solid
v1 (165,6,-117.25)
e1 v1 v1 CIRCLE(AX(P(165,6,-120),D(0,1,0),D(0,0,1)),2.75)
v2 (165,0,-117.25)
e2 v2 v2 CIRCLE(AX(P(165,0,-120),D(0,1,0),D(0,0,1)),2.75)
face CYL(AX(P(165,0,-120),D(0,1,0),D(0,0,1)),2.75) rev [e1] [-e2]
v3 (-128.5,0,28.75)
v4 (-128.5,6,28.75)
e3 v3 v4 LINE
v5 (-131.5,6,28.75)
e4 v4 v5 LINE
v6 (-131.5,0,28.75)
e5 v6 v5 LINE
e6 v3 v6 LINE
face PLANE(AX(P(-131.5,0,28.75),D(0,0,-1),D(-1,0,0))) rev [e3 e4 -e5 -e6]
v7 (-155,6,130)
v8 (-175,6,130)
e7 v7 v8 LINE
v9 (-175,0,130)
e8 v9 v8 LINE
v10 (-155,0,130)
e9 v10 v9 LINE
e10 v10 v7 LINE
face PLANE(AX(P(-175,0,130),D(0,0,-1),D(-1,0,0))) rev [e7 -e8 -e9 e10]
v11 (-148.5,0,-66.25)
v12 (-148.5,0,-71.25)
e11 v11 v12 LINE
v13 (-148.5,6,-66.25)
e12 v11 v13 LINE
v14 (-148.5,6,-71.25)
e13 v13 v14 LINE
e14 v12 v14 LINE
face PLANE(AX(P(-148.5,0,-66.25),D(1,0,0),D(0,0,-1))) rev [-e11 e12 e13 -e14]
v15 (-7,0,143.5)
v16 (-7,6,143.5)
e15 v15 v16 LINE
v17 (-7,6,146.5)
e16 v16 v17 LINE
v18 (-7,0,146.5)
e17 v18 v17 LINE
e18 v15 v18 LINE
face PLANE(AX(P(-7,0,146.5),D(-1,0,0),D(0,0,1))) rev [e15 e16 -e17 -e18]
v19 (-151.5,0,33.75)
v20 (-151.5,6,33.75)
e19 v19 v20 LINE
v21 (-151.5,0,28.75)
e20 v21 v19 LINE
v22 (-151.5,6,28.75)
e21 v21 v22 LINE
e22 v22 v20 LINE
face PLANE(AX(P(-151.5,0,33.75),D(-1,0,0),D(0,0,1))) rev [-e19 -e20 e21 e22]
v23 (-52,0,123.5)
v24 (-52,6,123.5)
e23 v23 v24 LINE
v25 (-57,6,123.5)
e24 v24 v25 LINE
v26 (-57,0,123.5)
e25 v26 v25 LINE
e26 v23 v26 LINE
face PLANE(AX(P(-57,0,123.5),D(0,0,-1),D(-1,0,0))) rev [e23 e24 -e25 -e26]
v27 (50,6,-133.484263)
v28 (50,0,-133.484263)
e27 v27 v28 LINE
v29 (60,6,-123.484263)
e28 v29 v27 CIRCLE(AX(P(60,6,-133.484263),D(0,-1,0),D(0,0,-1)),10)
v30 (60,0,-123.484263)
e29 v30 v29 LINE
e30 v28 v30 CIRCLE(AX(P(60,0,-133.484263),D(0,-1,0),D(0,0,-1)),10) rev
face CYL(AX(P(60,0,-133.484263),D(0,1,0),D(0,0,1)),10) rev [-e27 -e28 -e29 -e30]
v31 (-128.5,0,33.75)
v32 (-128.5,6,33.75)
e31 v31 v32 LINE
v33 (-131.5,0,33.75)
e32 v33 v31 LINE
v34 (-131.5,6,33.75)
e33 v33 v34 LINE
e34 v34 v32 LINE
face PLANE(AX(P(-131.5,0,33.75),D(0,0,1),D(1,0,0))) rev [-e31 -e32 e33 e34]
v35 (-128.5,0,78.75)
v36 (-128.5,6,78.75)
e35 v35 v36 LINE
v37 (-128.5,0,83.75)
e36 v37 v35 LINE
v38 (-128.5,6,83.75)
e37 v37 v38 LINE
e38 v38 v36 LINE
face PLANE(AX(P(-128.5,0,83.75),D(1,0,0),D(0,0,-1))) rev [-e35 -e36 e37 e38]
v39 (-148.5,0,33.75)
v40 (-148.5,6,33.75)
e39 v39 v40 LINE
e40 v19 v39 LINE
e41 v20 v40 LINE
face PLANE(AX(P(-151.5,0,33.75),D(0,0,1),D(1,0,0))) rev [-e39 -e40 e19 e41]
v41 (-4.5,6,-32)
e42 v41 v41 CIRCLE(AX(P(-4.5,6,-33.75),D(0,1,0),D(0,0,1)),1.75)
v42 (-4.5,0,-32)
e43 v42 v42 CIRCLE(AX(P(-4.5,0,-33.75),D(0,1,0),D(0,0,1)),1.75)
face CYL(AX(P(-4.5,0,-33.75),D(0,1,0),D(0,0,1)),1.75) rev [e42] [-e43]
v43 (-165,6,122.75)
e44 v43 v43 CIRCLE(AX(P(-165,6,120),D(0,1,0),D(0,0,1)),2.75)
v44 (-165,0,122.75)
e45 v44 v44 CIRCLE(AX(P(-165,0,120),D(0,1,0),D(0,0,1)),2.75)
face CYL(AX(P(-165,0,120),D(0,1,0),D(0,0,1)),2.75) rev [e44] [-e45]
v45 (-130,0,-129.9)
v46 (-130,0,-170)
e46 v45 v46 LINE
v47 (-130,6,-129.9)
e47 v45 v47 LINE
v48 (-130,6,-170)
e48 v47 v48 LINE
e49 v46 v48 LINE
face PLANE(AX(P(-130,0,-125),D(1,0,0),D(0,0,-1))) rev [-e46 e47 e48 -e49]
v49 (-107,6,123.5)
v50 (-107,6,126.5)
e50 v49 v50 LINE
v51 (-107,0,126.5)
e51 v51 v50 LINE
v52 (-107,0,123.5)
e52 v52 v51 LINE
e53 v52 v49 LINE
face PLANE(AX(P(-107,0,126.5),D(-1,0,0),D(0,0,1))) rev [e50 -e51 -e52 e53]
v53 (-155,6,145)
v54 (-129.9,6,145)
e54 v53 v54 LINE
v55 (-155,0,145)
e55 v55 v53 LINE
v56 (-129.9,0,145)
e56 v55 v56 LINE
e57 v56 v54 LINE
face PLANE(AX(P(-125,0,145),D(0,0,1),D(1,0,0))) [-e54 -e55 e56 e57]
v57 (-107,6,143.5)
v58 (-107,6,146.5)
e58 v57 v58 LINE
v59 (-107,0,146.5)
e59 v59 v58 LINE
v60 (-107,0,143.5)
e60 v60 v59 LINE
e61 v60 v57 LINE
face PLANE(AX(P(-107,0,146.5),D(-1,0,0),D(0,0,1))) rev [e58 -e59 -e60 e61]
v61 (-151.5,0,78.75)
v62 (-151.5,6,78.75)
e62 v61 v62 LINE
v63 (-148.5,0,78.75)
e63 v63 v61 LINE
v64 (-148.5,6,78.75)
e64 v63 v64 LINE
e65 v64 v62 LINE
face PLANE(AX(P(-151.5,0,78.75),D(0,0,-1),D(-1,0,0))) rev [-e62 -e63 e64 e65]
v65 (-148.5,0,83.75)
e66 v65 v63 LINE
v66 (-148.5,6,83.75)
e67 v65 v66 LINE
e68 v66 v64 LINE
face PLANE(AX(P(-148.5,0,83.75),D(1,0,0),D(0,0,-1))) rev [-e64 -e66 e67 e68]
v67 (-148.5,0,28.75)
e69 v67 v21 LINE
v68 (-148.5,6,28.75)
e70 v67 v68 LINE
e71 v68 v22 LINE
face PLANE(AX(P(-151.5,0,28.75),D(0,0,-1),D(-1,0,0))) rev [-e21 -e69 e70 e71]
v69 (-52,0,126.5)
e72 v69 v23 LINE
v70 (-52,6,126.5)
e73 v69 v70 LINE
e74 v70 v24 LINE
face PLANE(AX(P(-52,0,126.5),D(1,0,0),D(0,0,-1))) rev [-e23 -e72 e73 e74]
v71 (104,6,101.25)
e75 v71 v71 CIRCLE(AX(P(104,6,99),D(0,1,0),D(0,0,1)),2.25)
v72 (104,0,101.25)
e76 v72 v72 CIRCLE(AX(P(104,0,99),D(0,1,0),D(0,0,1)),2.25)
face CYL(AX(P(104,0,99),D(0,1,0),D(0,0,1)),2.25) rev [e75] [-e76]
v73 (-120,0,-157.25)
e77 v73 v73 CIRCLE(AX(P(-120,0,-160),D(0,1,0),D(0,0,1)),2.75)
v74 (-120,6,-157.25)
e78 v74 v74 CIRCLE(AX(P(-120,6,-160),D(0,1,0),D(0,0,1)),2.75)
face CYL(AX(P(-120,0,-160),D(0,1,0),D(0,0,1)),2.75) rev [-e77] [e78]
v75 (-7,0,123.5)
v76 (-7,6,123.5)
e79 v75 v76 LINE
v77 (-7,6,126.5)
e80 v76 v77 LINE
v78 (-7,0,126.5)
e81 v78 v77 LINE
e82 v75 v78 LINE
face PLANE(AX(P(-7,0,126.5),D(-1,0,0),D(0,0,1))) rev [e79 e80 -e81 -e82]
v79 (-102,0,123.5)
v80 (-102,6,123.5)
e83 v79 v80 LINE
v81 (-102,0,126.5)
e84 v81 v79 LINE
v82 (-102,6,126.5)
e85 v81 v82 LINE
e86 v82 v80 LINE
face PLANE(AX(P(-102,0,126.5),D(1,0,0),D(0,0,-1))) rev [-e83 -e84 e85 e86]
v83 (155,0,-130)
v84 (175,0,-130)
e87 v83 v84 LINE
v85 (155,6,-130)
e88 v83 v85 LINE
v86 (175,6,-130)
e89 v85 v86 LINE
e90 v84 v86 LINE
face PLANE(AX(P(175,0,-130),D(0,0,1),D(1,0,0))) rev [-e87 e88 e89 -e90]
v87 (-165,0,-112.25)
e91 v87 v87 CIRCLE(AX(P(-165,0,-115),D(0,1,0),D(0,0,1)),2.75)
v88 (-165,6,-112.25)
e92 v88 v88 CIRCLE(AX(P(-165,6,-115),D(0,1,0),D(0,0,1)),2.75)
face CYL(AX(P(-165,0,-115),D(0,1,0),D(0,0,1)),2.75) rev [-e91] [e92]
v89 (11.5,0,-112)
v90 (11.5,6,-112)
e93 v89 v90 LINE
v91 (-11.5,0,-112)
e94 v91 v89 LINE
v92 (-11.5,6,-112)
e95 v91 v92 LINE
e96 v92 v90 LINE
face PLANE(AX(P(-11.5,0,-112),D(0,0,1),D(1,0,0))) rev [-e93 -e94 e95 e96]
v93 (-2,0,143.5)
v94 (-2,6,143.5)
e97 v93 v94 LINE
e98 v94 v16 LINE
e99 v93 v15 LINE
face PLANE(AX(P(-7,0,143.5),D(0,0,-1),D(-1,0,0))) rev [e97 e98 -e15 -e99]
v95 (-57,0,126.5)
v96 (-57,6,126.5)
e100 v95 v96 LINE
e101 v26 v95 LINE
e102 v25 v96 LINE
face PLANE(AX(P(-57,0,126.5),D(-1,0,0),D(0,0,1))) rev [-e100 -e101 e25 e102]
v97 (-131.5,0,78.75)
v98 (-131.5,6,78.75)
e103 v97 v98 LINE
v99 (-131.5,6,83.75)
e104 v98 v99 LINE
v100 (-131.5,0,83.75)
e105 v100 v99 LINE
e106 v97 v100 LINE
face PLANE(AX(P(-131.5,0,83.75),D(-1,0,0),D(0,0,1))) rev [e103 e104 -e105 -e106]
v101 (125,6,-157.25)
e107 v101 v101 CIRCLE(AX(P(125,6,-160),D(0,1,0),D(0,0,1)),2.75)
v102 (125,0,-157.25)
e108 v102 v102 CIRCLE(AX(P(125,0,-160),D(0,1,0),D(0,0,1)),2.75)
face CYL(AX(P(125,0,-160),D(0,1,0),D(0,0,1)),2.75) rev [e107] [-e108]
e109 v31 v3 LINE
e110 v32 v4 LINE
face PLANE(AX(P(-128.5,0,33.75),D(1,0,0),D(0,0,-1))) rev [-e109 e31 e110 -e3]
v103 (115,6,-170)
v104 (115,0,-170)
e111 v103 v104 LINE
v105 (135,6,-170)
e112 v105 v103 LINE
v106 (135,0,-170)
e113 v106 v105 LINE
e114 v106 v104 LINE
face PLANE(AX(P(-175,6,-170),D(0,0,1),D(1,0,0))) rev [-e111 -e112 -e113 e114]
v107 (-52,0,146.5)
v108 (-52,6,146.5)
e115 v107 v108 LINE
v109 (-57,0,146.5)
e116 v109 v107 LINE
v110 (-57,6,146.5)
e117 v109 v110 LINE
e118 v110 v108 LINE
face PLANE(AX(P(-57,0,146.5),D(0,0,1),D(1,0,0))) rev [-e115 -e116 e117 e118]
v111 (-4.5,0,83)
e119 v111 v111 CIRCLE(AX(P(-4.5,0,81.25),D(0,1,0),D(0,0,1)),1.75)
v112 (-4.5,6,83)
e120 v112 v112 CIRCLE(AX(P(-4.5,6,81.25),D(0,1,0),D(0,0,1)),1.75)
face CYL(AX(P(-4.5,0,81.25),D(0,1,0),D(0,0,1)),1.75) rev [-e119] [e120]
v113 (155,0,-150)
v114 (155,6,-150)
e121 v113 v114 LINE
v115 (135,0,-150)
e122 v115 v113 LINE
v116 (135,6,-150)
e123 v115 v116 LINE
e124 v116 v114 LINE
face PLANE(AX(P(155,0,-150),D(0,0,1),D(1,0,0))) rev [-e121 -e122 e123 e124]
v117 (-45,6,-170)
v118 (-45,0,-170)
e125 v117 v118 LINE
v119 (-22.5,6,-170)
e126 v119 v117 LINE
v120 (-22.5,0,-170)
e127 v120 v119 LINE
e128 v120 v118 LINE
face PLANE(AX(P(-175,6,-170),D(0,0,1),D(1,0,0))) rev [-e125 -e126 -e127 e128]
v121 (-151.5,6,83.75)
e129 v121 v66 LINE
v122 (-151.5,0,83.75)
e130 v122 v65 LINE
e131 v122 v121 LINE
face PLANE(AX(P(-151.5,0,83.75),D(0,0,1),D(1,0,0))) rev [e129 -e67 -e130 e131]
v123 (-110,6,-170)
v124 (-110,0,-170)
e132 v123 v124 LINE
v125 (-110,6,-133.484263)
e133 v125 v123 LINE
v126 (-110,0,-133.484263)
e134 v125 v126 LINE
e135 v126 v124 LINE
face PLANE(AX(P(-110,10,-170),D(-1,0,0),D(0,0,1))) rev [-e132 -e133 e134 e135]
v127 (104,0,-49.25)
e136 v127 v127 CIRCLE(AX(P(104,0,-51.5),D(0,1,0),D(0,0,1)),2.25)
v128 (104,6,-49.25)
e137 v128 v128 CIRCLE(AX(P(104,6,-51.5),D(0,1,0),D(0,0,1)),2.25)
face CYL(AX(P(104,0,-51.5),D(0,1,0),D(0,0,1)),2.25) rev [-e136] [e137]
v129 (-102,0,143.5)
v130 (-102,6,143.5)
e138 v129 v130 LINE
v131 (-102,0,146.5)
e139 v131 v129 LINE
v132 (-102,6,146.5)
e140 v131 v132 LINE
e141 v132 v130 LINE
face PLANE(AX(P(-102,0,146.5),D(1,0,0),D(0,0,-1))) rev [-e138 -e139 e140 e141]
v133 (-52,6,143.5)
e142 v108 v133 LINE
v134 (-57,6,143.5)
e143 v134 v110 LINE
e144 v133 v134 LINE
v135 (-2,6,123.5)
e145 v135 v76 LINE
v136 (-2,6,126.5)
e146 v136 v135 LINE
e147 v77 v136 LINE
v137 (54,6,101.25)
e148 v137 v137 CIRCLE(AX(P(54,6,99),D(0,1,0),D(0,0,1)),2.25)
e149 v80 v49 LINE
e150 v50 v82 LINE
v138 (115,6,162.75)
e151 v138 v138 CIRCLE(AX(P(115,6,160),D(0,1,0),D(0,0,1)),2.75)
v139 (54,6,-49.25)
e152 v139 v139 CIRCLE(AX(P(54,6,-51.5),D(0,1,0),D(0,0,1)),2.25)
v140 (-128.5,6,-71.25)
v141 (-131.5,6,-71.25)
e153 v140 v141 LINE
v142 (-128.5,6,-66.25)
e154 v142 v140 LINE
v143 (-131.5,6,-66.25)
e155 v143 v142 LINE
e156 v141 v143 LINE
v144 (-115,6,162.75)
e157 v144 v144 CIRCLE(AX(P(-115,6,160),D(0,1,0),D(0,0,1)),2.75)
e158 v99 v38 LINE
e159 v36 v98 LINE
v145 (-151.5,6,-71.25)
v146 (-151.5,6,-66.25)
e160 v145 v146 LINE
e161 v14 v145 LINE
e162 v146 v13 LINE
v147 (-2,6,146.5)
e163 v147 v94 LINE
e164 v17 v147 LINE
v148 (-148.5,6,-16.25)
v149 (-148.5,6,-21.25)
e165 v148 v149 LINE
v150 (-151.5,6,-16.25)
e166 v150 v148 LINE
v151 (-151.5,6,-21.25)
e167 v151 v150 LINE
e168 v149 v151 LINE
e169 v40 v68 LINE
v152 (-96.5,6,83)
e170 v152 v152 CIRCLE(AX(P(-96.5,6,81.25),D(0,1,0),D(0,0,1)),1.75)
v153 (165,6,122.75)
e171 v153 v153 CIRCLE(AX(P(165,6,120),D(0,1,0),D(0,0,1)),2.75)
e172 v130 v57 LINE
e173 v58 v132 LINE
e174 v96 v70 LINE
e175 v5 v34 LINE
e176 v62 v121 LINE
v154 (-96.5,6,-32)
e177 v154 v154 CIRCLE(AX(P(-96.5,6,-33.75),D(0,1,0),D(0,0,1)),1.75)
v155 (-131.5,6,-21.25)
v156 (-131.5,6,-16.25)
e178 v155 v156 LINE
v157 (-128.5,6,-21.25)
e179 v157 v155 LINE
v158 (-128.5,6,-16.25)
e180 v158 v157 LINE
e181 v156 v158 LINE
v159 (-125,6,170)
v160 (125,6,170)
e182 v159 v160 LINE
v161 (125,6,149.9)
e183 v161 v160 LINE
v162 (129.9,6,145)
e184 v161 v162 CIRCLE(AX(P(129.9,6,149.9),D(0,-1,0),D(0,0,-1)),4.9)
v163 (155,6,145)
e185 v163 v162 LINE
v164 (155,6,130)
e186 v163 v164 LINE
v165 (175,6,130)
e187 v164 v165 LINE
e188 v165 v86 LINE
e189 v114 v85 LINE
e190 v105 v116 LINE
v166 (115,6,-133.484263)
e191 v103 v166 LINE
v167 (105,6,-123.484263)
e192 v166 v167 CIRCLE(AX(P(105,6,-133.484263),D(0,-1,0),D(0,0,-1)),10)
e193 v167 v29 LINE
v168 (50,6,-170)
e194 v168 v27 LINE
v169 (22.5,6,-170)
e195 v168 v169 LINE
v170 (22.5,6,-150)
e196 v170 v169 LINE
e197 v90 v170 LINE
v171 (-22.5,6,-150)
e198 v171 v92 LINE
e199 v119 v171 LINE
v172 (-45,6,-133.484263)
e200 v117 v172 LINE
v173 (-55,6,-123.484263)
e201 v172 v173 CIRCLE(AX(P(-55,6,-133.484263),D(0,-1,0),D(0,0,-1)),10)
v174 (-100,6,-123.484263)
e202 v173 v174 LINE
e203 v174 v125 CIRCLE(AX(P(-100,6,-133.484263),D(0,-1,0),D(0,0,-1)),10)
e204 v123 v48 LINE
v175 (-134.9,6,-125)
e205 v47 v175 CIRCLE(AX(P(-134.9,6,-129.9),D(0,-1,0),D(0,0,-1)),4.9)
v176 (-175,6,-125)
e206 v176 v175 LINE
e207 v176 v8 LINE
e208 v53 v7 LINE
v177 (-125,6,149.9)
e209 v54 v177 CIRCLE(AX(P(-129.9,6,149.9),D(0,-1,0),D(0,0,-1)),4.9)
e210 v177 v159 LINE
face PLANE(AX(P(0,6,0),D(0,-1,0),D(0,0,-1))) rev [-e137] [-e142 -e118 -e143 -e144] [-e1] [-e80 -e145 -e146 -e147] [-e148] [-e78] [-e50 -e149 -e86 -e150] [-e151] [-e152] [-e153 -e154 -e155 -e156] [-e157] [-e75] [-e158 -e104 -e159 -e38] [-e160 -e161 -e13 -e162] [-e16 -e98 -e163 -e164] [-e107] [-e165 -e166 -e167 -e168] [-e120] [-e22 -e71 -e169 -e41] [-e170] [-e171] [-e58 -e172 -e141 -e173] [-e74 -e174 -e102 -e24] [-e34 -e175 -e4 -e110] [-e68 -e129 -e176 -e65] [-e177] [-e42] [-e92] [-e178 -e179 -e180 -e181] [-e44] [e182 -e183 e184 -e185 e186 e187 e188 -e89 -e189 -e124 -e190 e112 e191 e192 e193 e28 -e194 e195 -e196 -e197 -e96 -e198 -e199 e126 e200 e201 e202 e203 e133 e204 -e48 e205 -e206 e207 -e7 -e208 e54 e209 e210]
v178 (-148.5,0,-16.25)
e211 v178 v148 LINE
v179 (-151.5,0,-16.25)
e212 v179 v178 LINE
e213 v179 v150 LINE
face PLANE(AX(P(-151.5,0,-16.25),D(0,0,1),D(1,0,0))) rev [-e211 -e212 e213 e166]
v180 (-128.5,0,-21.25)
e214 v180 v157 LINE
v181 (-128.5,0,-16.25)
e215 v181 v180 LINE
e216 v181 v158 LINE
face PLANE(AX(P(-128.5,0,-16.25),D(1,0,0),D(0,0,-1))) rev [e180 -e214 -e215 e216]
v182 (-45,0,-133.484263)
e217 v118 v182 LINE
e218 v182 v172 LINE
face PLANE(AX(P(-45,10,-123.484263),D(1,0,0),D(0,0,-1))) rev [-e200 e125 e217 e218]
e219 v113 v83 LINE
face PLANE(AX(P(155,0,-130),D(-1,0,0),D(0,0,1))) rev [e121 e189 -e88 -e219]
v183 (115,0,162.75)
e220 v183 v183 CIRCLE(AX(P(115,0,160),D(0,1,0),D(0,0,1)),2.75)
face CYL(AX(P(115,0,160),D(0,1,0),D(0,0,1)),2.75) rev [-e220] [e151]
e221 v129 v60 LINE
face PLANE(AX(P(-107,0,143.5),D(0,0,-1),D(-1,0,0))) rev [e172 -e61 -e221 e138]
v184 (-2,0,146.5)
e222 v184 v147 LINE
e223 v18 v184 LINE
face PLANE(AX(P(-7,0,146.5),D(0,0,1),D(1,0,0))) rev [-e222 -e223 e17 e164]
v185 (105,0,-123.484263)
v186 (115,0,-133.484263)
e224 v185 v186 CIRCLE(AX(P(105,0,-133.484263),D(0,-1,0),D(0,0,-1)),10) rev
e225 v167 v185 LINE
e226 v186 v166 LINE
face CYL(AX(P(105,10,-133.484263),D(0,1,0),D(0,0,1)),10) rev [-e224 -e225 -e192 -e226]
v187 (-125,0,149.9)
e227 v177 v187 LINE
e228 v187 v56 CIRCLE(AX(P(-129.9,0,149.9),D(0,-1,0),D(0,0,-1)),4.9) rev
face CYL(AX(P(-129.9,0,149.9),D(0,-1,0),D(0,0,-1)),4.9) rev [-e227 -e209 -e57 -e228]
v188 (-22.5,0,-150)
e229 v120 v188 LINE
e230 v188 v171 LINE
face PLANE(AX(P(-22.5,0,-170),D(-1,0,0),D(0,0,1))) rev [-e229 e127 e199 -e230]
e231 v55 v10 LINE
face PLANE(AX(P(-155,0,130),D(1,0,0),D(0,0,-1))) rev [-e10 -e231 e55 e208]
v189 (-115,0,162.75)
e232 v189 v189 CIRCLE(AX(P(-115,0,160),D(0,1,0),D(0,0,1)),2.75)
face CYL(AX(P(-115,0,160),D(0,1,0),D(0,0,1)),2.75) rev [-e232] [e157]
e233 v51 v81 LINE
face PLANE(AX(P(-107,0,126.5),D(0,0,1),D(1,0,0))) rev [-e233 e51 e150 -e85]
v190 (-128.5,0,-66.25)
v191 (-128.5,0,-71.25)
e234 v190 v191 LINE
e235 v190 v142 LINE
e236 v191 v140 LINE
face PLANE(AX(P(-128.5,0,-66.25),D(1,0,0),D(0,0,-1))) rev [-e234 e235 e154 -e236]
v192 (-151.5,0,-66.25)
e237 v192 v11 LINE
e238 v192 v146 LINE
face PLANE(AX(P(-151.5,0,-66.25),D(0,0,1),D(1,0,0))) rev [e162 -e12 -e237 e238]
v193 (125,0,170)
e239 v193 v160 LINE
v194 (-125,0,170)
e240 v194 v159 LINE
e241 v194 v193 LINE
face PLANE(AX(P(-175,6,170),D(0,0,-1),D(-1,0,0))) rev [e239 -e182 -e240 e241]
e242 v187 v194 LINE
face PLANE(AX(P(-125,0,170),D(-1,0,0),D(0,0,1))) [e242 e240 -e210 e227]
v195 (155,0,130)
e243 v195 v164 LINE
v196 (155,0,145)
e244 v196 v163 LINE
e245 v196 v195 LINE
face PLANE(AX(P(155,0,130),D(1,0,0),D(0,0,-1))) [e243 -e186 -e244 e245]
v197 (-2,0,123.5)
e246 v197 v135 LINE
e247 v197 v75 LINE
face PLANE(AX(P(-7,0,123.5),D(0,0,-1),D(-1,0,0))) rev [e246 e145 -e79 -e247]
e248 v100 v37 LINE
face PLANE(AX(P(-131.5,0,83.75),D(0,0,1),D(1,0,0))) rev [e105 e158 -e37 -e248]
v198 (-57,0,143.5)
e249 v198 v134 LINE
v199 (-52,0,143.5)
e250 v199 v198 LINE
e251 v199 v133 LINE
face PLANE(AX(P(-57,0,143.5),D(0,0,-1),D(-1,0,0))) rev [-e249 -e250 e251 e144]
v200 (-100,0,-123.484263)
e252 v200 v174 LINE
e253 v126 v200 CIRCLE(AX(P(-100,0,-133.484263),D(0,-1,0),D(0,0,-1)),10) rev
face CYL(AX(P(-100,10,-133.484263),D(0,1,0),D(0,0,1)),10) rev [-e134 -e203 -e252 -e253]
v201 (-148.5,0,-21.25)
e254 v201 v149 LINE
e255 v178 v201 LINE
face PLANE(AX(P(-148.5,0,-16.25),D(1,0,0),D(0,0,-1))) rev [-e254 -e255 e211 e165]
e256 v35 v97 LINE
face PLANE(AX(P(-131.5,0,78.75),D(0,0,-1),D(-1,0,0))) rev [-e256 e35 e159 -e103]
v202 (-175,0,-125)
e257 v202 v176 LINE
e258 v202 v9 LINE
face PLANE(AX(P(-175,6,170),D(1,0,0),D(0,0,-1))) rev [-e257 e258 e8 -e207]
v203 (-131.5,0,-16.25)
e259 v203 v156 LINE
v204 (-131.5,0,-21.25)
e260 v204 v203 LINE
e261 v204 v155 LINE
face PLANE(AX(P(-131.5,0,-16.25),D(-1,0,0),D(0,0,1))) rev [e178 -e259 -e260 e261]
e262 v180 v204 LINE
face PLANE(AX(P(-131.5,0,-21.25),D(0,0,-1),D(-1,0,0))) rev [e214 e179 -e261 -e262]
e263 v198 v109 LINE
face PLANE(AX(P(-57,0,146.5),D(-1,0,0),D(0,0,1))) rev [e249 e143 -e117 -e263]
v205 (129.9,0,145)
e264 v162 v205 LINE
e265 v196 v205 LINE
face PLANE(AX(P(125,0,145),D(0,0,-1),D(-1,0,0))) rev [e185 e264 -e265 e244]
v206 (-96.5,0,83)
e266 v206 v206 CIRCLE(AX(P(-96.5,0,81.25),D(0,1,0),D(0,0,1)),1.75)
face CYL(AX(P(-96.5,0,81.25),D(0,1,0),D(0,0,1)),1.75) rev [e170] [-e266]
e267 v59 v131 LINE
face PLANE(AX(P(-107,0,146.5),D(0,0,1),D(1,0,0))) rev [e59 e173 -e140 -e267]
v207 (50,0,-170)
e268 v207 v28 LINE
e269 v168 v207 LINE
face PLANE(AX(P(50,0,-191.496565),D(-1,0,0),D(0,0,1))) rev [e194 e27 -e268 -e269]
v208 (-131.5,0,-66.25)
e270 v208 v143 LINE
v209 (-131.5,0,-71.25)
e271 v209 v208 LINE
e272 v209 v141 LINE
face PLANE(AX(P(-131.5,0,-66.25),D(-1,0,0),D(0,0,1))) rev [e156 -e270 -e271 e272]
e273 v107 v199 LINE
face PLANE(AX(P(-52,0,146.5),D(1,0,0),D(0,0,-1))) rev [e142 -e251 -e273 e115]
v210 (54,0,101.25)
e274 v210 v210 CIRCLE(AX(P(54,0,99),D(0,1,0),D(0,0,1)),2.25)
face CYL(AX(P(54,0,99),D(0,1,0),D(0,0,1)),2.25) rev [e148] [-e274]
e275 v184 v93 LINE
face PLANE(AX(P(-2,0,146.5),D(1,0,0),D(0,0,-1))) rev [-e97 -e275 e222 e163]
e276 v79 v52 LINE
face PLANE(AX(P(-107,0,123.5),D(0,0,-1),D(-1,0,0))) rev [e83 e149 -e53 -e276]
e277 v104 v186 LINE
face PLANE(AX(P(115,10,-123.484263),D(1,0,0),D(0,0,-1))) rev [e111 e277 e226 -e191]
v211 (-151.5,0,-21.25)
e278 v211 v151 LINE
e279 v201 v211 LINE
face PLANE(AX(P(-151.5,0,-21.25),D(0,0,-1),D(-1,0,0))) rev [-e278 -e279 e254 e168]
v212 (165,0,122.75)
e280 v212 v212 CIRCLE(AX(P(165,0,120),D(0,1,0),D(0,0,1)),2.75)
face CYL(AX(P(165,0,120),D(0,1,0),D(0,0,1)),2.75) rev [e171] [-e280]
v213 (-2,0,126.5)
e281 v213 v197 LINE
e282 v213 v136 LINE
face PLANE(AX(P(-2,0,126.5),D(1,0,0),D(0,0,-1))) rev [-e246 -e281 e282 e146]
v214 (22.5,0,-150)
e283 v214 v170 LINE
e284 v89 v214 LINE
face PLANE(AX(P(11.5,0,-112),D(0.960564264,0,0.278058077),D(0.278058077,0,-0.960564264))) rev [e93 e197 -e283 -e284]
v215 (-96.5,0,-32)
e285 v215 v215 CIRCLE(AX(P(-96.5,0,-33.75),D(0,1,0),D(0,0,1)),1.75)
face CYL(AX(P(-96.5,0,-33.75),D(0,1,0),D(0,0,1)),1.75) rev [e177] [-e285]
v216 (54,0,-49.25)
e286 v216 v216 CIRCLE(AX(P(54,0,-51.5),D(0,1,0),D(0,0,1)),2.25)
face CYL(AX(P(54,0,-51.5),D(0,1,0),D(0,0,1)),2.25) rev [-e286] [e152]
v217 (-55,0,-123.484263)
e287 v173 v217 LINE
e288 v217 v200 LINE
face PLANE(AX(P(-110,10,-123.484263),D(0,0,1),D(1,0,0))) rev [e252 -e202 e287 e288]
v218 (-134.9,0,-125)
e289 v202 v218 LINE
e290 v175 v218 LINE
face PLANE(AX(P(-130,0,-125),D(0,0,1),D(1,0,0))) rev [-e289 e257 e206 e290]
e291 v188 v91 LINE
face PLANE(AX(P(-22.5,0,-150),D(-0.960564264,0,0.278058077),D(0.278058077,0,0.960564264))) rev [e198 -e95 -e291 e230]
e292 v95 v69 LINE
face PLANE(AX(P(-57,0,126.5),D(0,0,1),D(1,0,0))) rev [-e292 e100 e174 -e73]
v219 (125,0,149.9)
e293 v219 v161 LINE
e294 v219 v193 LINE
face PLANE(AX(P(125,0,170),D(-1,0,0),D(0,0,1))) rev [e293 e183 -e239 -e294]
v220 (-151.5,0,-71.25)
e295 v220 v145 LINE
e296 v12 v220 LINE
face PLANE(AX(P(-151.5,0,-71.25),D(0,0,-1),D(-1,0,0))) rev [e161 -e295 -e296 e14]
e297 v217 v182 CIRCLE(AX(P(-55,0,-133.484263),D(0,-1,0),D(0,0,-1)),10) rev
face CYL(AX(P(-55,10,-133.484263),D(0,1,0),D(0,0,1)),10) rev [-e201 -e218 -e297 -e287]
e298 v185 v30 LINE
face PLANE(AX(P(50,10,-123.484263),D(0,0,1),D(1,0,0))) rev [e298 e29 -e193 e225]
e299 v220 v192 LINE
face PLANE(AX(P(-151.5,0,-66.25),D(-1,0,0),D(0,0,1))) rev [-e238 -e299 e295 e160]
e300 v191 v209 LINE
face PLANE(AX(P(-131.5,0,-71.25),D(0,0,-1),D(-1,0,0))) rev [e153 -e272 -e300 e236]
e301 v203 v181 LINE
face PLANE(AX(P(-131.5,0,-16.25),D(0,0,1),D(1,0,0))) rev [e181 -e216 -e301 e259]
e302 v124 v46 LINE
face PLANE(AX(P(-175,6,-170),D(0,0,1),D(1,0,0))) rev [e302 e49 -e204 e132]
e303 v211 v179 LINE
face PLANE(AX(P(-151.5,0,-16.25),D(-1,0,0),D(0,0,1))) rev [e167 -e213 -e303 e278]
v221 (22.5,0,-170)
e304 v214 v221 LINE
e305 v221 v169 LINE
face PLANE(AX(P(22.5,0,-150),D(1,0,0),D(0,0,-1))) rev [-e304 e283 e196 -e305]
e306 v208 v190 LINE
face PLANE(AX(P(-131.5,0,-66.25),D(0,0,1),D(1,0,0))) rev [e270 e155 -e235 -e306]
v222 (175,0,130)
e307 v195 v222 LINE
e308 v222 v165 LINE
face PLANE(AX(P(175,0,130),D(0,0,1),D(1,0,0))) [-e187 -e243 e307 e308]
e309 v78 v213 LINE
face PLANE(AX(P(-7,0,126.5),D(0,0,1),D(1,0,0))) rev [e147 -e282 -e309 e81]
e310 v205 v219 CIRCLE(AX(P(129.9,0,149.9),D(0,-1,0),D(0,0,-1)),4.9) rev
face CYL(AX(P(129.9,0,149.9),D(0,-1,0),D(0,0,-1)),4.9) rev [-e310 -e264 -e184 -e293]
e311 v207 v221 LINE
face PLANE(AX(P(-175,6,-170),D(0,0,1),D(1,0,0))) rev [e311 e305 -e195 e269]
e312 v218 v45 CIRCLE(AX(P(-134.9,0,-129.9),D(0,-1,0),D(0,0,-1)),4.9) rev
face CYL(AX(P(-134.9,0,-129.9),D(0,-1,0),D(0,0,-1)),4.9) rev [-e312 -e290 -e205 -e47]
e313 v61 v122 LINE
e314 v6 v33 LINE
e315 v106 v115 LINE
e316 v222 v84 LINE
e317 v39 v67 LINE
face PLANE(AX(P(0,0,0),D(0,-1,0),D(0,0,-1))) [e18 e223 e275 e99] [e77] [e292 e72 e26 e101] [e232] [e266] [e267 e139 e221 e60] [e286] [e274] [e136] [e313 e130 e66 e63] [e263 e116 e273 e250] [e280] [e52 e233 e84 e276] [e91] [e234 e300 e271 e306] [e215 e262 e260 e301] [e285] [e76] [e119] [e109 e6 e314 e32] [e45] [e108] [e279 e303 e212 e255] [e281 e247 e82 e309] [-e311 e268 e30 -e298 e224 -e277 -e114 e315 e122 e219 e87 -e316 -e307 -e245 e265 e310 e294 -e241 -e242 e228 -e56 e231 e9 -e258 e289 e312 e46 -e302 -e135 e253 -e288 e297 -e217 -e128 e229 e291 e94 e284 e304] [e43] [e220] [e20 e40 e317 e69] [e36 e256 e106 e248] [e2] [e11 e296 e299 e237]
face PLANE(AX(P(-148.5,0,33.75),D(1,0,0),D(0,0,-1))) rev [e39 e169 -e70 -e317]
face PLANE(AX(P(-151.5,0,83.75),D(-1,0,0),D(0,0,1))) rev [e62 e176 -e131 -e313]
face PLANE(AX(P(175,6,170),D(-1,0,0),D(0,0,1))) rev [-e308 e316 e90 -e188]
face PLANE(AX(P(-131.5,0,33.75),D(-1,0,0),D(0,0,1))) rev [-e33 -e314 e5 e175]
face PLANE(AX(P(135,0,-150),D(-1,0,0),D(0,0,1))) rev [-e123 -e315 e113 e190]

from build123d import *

# Parameters (mm, degrees)
SKETCH1_W            = 350
SKETCH1_H            = 340
BOSS_EXTRUDE1_DEPTH  = 6
CUT_EXTRUDE2_DEPTH   = 6
MIRROR2_COPY_1_DEPTH = 6
CUT_EXTRUDE3_DEPTH   = 6
SKETCH4_W            = 10
SKETCH4_H            = 82.256980738
CUT_EXTRUDE4_DEPTH   = 6
SKETCH5_R            = 2.25
SKETCH5_R_2          = 1.75
CUT_EXTRUDE5_DEPTH   = 6
SKETCH6_W            = 12
SKETCH6_H            = 9
CUT_EXTRUDE6_DEPTH   = 6
SKETCH8_W            = 5
SKETCH8_H            = 3
CUT_EXTRUDE7_DEPTH   = 6
LPATTERN1_COUNT      = 3
LPATTERN1_PITCH      = 50
SKETCH9_W            = 3
SKETCH9_H            = 5
CUT_EXTRUDE8_DEPTH   = 6
LPATTERN2_COUNT      = 4
LPATTERN2_PITCH      = 50
SKETCH10_W           = 30
SKETCH10_H           = 25
CUT_EXTRUDE9_DEPTH   = 6
SKETCH11_W           = 10
SKETCH11_H           = 51.49656536
CUT_EXTRUDE10_DEPTH  = 6
SKETCH12_W           = 45
SKETCH12_H           = 45
CUT_EXTRUDE11_DEPTH  = 6
FILLET2_R            = 4.9
SKETCH13_R           = 2.75
CUT_EXTRUDE12_DEPTH  = 6
SKETCH14_W           = 50
SKETCH14_H           = 20
SKETCH14_W_2         = 40
CUT_EXTRUDE13_DEPTH  = 10
FILLET4_R            = 5
FILLET5_R            = 5
SKETCH15_W           = 65
SKETCH15_H           = 46.515736948
CUT_EXTRUDE14_DEPTH  = 10
FILLET6_R            = 10


with BuildPart() as part:
    # Sketch1 → Boss-Extrude1 (new body)
    with BuildSketch(Plane(origin=(0, 0, 0), x_dir=(1, 0, 0), z_dir=(0, 1, 0))):
        Rectangle(SKETCH1_W, SKETCH1_H)
    extrude(amount=BOSS_EXTRUDE1_DEPTH)

    # Sketch2 → Cut-Extrude2 (cut)
    with BuildSketch(Plane(origin=(0, 6, 0), x_dir=(1, 0, 0), z_dir=(0, 1, 0))):
        Polygon((-175, -130), (-155, -130), (-155, -150), (-135, -150), (-135, -170), (-175, -170), align=None)
    cut_extrude2 = extrude(amount=-CUT_EXTRUDE2_DEPTH, mode=Mode.SUBTRACT)

    # Mirror1: Cut-Extrude2 across plane
    add(cut_extrude2.mirror(Plane.XY), mode=Mode.SUBTRACT)

    # Mirror2: Cut-Extrude2 across plane
    add(cut_extrude2.mirror(Plane(origin=(0, 0, 0), x_dir=(0, 0, 1), z_dir=(1, 0, 0))), mode=Mode.SUBTRACT)

    # Mirror2 copy 1 sketch → Mirror2 copy 1 (cut)
    with BuildSketch(Plane(origin=(0, 6, 0), x_dir=(-1, 0, 0), z_dir=(0, 1, 0))):
        Polygon((-175, -130), (-155, -130), (-155, -150), (-135, -150), (-135, -170), (-175, -170), align=None)
    extrude(amount=-MIRROR2_COPY_1_DEPTH, mode=Mode.SUBTRACT)

    # Sketch3 → Cut-Extrude3 (cut)
    with BuildSketch(Plane(origin=(0, 6, 0), x_dir=(1, 0, 0), z_dir=(0, 1, 0))):
        Polygon((-22.5, 170), (-22.5, 150), (-11.5, 112), (11.5, 112), (22.5, 150), (22.5, 170), align=None)
    extrude(amount=-CUT_EXTRUDE3_DEPTH, mode=Mode.SUBTRACT)

    # Sketch4 → Cut-Extrude4 (cut)
    with BuildSketch(Plane(origin=(0, 6, 0), x_dir=(1, 0, 0), z_dir=(0, 1, 0))):
        with Locations((-97.5, 165.128490369)):
            Rectangle(SKETCH4_W, SKETCH4_H)
        with Locations((97.5, 165.128490369)):
            Rectangle(SKETCH4_W, SKETCH4_H)
    extrude(amount=-CUT_EXTRUDE4_DEPTH, mode=Mode.SUBTRACT)

    # Sketch5 → Cut-Extrude5 (cut)
    with BuildSketch(Plane(origin=(0, 6, 0), x_dir=(1, 0, 0), z_dir=(0, 1, 0))):
        with Locations(Location((104, 51.5, 0), (0, 0, 270))):
            Circle(SKETCH5_R)
        with Locations(Location((104, -99, 0), (0, 0, 270))):
            Circle(SKETCH5_R)
        with Locations(Location((54, -99, 0), (0, 0, 270))):
            Circle(SKETCH5_R)
        with Locations(Location((54, 51.5, 0), (0, 0, 270))):
            Circle(SKETCH5_R)
        with Locations(Location((-4.5, 33.75, 0), (0, 0, 270))):
            Circle(SKETCH5_R_2)
        with Locations(Location((-4.5, -81.25, 0), (0, 0, 270))):
            Circle(SKETCH5_R_2)
        with Locations(Location((-96.5, -81.25, 0), (0, 0, 270))):
            Circle(SKETCH5_R_2)
        with Locations(Location((-96.5, 33.75, 0), (0, 0, 270))):
            Circle(SKETCH5_R_2)
    extrude(amount=-CUT_EXTRUDE5_DEPTH, mode=Mode.SUBTRACT)

    # Sketch6 → Cut-Extrude6 (cut)
    with BuildSketch(Plane(origin=(0, 6, 0), x_dir=(1, 0, 0), z_dir=(0, 1, 0))):
        with Locations((-97.5, 145.5)):
            Rectangle(SKETCH6_W, SKETCH6_H)
        with Locations((97.5, 145.5)):
            Rectangle(SKETCH6_W, SKETCH6_H)
    extrude(amount=-CUT_EXTRUDE6_DEPTH, mode=Mode.SUBTRACT)

    # Sketch8 → Cut-Extrude7 (cut)
    with BuildSketch(Plane(origin=(0, 6, 0), x_dir=(1, 0, 0), z_dir=(0, 1, 0))):
        with Locations((-4.5, -125)):
            Rectangle(SKETCH8_W, SKETCH8_H)
        with Locations((-4.5, -145)):
            Rectangle(SKETCH8_W, SKETCH8_H)
    cut_extrude7 = extrude(amount=-CUT_EXTRUDE7_DEPTH, mode=Mode.SUBTRACT)

    # LPattern1: Cut-Extrude7 ×3
    with Locations(*[(-i * LPATTERN1_PITCH, 0, 0) for i in range(1, LPATTERN1_COUNT)]):
        add(cut_extrude7, mode=Mode.SUBTRACT)

    # Sketch9 → Cut-Extrude8 (cut)
    with BuildSketch(Plane(origin=(0, 6, 0), x_dir=(1, 0, 0), z_dir=(0, 1, 0))):
        with Locations((-150, -81.25)):
            Rectangle(SKETCH9_W, SKETCH9_H)
        with Locations((-130, -81.25)):
            Rectangle(SKETCH9_W, SKETCH9_H)
    cut_extrude8 = extrude(amount=-CUT_EXTRUDE8_DEPTH, mode=Mode.SUBTRACT)

    # LPattern2: Cut-Extrude8 ×4
    with Locations(*[(0, 0, -i * LPATTERN2_PITCH) for i in range(1, LPATTERN2_COUNT)]):
        add(cut_extrude8, mode=Mode.SUBTRACT)

    # Sketch10 → Cut-Extrude9 (cut)
    with BuildSketch(Plane(origin=(0, 6, 0), x_dir=(1, 0, 0), z_dir=(0, 1, 0))):
        with Locations((140, -157.5)):
            Rectangle(SKETCH10_W, SKETCH10_H)
    cut_extrude9 = extrude(amount=-CUT_EXTRUDE9_DEPTH, mode=Mode.SUBTRACT)

    # Mirror3: Cut-Extrude9 across plane
    add(cut_extrude9.mirror(Plane(origin=(0, 0, 0), x_dir=(0, 0, 1), z_dir=(1, 0, 0))), mode=Mode.SUBTRACT)

    # Sketch11 → Cut-Extrude10 (cut)
    with BuildSketch(Plane(origin=(0, 6, 0), x_dir=(1, 0, 0), z_dir=(0, 1, 0))):
        with Locations((55, 165.74828268)):
            Rectangle(SKETCH11_W, SKETCH11_H)
    extrude(amount=-CUT_EXTRUDE10_DEPTH, mode=Mode.SUBTRACT)

    # Sketch12 → Cut-Extrude11 (cut)
    with BuildSketch(Plane(origin=(0, 6, 0), x_dir=(1, 0, 0), z_dir=(0, 1, 0))):
        with Locations((-152.5, 147.5)):
            Rectangle(SKETCH12_W, SKETCH12_H)
    extrude(amount=-CUT_EXTRUDE11_DEPTH, mode=Mode.SUBTRACT)

    # Fillet2
    fillet2_edges = [part.edges().sort_by_distance(p)[0] for p in [
        (125, 3, 145),
        (-125, 3, 145),
        (50, 3, -140),
        (60, 3, -140),
        (-130, 3, -125),
    ]]
    fillet(fillet2_edges, radius=FILLET2_R)

    # Sketch13 → Cut-Extrude12 (cut)
    with BuildSketch(Plane(origin=(0, 6, 0), x_dir=(1, 0, 0), z_dir=(0, 1, 0))):
        with Locations(Location((165, -120, 0), (0, 0, 270))):
            Circle(SKETCH13_R)
        with Locations(Location((165, 120, 0), (0, 0, 270))):
            Circle(SKETCH13_R)
        with Locations(Location((125, 160, 0), (0, 0, 270))):
            Circle(SKETCH13_R)
        with Locations(Location((-120, 160, 0), (0, 0, 270))):
            Circle(SKETCH13_R)
        with Locations(Location((-165, 115, 0), (0, 0, 270))):
            Circle(SKETCH13_R)
        with Locations(Location((-165, -120, 0), (0, 0, 270))):
            Circle(SKETCH13_R)
        with Locations(Location((-115, -160, 0), (0, 0, 270))):
            Circle(SKETCH13_R)
        with Locations(Location((115, -160, 0), (0, 0, 270))):
            Circle(SKETCH13_R)
    extrude(amount=-CUT_EXTRUDE12_DEPTH, mode=Mode.SUBTRACT)

    # Sketch14 → Cut-Extrude13 (cut)
    with BuildSketch(Plane(origin=(0, 6, 0), x_dir=(1, 0, 0), z_dir=(0, 1, 0))):
        with Locations((82.5, 160)):
            Rectangle(SKETCH14_W, SKETCH14_H)
        with Locations((-87.5, 160)):
            Rectangle(SKETCH14_W_2, SKETCH14_H)
    extrude(amount=-CUT_EXTRUDE13_DEPTH, mode=Mode.SUBTRACT)

    # Fillet4
    fillet4_edges = [part.edges().sort_by_distance(p)[0] for p in [
        (-102.5, 3, -124),
        (-92.5, 3, -124),
    ]]
    fillet(fillet4_edges, radius=FILLET4_R - 0.0001)  # a hair under: the kernel refuses the full size

    # Fillet5
    fillet5_edges = [part.edges().sort_by_distance(p)[0] for p in [
        (92.5, 3, -124),
        (102.5, 3, -124),
    ]]
    fillet(fillet5_edges, radius=FILLET5_R - 0.0001)  # a hair under: the kernel refuses the full size

    # Sketch15 → Cut-Extrude14 (cut)
    with BuildSketch(Plane(origin=(0, 0, 0), x_dir=(-1, 0, 0), z_dir=(0, -1, 0))):
        with Locations((77.5, 146.742131526)):
            Rectangle(SKETCH15_W, SKETCH15_H)
        with Locations((-82.5, 146.742131526)):
            Rectangle(SKETCH15_W, SKETCH15_H)
    extrude(amount=-CUT_EXTRUDE14_DEPTH, mode=Mode.SUBTRACT)

    # Fillet6
    fillet6_edges = [part.edges().sort_by_distance(p)[0] for p in [
        (-110, 3, -123.484263052),
        (-45, 3, -123.484263052),
        (50, 3, -123.484263052),
        (115, 3, -123.484263052),
    ]]
    fillet(fillet6_edges, radius=FILLET6_R)


solid = part.part
